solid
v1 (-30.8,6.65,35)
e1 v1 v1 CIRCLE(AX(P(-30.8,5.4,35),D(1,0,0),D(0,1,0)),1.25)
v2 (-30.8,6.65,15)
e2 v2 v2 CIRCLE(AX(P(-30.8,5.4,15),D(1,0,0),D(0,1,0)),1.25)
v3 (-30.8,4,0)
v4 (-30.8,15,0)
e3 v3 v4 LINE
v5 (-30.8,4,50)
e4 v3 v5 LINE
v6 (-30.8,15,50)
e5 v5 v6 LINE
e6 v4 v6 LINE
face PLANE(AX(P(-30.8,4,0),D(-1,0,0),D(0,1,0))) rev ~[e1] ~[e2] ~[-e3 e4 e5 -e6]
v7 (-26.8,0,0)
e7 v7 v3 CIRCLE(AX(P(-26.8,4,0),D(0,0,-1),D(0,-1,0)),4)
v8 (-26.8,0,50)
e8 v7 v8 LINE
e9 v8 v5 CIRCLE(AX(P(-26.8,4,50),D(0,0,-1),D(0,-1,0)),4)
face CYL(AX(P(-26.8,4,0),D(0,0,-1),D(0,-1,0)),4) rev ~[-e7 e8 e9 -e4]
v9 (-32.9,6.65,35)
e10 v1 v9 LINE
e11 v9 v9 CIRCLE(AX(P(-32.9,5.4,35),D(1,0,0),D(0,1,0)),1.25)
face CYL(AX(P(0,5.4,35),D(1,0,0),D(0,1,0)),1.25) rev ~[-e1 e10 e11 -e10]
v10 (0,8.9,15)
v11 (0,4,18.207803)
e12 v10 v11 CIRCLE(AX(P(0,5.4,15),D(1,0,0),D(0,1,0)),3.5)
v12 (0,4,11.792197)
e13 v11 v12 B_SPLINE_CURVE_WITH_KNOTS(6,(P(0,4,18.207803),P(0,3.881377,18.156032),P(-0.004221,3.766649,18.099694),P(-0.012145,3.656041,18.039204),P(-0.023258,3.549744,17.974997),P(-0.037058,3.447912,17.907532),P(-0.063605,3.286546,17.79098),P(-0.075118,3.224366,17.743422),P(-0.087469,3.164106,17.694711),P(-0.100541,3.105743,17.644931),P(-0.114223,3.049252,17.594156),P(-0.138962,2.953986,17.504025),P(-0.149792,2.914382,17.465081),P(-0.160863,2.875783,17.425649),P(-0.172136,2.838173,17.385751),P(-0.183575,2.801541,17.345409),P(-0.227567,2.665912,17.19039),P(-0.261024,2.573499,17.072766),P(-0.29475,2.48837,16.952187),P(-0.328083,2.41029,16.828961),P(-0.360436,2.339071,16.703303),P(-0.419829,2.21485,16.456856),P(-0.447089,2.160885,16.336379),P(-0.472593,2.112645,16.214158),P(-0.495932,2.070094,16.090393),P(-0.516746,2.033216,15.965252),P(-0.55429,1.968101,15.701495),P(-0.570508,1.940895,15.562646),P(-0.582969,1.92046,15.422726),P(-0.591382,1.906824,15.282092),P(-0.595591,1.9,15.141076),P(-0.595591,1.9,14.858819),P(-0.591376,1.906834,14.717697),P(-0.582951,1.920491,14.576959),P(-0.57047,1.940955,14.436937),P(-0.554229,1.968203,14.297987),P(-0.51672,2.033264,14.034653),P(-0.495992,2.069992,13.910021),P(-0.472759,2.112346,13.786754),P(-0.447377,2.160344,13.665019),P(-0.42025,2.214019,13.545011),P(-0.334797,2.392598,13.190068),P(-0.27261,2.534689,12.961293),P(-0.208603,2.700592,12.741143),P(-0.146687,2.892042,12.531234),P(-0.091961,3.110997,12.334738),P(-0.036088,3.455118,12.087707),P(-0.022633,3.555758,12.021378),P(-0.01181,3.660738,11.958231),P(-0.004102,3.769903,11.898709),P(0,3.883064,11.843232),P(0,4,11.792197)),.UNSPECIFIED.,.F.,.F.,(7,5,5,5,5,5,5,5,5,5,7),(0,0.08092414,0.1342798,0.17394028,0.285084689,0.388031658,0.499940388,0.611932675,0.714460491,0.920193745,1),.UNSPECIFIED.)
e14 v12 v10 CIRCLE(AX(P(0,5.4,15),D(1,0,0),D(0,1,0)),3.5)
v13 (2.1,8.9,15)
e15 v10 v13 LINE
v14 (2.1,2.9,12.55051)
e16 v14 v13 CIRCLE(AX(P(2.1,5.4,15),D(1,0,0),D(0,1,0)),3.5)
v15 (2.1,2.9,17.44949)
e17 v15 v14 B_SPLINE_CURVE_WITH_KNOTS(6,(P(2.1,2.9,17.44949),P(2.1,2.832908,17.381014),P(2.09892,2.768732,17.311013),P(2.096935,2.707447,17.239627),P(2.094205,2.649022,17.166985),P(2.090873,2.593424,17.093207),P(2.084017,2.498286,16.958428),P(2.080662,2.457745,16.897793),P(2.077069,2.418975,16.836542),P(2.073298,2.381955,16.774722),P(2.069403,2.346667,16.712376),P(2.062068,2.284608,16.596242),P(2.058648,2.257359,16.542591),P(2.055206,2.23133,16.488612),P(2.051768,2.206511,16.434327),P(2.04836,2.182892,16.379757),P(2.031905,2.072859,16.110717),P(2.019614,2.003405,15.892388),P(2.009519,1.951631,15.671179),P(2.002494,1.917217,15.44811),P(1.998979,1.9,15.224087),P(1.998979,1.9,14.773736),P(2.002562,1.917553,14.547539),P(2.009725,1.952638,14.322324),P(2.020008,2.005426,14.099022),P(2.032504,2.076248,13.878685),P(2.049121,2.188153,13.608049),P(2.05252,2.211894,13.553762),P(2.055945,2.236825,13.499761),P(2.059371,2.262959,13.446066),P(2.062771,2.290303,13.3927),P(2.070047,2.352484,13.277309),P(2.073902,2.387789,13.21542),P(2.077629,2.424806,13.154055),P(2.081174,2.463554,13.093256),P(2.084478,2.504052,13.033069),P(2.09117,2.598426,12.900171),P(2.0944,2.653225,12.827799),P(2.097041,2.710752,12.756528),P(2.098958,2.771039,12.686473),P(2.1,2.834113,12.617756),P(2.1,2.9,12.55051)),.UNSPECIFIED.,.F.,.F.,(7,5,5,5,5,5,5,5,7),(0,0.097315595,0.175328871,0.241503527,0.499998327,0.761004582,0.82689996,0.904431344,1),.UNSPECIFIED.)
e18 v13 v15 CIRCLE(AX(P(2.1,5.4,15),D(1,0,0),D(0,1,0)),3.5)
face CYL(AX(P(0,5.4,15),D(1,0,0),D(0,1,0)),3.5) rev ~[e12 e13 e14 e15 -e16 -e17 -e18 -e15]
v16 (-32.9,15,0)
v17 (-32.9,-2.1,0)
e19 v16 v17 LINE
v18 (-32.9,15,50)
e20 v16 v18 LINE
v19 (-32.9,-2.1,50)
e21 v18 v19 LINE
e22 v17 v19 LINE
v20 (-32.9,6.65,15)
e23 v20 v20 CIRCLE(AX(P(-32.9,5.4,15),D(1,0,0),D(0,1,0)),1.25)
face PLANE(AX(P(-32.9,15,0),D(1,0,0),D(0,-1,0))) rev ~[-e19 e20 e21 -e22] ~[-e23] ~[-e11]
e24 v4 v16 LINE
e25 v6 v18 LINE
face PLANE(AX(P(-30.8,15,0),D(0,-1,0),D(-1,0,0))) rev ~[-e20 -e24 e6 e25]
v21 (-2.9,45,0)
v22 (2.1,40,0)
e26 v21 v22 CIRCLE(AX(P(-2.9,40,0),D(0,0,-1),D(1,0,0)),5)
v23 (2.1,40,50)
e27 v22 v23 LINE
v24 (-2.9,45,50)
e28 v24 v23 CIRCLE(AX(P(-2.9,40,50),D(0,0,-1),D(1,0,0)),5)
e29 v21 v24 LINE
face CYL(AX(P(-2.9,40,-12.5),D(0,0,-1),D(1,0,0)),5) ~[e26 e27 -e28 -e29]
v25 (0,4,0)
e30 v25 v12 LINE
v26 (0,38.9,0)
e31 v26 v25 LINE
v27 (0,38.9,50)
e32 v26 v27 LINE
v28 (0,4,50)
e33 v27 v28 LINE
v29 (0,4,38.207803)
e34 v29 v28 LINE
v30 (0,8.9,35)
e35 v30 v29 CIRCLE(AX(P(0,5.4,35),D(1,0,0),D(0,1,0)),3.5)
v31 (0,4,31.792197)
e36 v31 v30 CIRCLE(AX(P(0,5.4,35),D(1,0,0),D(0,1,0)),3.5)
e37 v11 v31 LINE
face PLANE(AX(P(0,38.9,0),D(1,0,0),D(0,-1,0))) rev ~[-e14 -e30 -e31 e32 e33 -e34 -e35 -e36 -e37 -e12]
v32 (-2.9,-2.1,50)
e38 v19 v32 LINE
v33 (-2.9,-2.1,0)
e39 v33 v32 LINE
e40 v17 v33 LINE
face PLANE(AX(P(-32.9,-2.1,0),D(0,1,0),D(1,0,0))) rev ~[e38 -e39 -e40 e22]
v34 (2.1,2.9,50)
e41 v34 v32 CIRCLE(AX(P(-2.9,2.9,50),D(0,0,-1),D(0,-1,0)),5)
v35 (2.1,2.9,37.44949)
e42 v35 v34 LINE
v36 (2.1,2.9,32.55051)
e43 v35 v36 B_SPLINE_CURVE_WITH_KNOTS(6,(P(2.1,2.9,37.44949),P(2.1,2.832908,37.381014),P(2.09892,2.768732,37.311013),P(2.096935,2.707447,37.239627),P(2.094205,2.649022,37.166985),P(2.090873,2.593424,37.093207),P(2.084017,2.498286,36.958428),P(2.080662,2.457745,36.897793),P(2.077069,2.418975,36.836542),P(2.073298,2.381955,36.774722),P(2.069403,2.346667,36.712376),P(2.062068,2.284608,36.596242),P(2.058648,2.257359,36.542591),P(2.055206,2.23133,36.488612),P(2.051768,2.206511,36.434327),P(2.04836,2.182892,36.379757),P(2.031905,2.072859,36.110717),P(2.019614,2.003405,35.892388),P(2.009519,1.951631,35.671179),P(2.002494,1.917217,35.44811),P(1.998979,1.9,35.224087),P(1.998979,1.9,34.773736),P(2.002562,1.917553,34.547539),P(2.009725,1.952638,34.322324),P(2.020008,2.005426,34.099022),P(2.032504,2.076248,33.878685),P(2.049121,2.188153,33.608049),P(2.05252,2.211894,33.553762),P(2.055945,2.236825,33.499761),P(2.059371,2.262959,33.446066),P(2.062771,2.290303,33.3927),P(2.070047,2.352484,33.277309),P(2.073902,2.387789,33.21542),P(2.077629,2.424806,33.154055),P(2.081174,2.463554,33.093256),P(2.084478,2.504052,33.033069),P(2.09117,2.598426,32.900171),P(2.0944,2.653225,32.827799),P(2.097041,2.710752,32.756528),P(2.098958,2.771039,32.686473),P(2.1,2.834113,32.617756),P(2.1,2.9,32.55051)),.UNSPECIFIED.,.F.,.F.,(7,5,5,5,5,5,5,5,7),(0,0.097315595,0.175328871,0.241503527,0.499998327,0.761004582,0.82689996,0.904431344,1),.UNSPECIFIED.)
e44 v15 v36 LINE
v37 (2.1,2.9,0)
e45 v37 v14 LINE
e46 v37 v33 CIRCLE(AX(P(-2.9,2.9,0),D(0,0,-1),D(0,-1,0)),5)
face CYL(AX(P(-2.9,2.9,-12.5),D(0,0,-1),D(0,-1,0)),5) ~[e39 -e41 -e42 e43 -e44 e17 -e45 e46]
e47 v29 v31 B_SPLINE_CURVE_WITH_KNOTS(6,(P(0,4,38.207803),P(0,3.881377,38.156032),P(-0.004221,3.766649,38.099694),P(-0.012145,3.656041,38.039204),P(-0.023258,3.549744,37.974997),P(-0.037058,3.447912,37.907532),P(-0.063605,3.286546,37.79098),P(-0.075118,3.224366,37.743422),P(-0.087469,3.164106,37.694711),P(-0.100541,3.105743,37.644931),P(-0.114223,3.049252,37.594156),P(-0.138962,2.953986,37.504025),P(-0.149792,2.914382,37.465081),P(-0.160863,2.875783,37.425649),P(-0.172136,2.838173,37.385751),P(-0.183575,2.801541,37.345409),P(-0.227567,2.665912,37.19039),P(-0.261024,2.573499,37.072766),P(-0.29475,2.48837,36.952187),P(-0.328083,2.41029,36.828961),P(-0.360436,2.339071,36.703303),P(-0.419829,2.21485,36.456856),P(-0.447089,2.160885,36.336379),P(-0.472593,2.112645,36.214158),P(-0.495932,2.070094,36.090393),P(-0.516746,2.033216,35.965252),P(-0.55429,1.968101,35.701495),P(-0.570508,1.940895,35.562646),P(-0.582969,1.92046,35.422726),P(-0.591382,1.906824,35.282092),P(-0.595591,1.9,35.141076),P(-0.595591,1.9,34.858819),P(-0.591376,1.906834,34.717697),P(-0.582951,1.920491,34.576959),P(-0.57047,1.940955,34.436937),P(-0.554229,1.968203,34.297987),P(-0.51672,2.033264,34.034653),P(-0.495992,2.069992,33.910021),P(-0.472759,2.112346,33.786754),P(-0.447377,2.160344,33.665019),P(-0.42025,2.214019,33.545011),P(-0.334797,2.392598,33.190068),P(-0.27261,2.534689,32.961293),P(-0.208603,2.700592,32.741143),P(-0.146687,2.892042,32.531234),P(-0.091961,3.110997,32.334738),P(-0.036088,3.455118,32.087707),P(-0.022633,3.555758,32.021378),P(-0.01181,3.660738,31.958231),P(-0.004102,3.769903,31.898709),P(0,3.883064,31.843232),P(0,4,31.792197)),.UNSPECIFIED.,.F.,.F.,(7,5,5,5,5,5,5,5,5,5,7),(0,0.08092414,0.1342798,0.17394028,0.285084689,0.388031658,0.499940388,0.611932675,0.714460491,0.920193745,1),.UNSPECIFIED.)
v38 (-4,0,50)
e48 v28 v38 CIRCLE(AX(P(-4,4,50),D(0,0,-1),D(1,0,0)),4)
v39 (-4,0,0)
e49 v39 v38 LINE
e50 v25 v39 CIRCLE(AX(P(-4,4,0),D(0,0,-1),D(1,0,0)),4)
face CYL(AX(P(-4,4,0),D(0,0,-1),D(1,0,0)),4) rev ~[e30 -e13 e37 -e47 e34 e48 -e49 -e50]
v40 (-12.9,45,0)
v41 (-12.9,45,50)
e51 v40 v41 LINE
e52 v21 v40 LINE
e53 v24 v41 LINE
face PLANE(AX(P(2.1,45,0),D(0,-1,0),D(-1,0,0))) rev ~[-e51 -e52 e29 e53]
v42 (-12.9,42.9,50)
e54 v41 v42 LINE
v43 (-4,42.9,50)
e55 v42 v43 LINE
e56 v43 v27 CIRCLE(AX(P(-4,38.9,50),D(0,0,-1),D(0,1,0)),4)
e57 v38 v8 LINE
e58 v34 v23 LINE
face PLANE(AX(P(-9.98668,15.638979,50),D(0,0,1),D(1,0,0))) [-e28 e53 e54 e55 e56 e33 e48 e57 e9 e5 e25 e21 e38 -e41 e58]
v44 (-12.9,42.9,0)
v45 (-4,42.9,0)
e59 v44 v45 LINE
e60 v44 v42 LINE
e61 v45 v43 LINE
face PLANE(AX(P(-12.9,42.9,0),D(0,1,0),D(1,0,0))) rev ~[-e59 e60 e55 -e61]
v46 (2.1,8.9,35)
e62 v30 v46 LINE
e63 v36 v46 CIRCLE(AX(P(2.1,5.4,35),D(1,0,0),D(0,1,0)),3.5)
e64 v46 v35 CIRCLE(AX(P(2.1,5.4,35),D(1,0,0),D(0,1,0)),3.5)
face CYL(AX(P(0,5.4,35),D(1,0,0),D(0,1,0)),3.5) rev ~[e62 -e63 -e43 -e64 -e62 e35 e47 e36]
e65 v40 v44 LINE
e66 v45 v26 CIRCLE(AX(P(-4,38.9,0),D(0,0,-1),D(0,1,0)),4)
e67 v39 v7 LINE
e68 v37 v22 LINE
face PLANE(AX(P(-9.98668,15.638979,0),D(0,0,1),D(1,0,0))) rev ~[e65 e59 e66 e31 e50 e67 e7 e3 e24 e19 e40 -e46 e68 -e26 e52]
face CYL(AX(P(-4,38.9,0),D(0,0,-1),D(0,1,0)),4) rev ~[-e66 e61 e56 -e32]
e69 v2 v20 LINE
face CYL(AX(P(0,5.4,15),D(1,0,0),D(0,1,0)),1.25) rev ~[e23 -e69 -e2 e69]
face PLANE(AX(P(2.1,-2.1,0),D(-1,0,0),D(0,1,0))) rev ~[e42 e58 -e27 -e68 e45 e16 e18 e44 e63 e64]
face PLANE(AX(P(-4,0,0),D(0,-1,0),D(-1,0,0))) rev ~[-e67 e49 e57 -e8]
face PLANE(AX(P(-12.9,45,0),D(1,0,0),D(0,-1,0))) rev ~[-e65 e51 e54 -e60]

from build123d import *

# Parameters (mm, degrees)
F1_DEPTH      = 50
F2_R          = 1.25
F3_DEPTH      = 32.901
F2_R_2        = 3.5
F4_DEPTH      = 2.1
F4_DEPTH_BACK = 10
F5_T1_DEPTH   = 75


# Not quite as in the source:
# - a fillet or chamfer that OpenCascade refuses, or shapes differently, is made with other operations: its cross-section is extruded or revolved along the edge and cut away or added


with BuildPart() as f1:
    # F0 (on Top) → F1 (new body)
    with BuildSketch(Plane.XY):
        with BuildLine():
            ThreePointArc((0, 4), (-1.1715728753, 1.1715728753), (-4, 0))
            Line((-4, 0), (-26.8, 0))
            ThreePointArc((-26.8, 0), (-29.6284271247, 1.1715728753), (-30.8, 4))
            Line((-30.8, 4), (-30.8, 15))
            Line((-30.8, 15), (-32.9, 15))
            Line((-32.9, 15), (-32.9, -2.1))
            Line((-32.9, -2.1), (2.1, -2.1))
            Line((2.1, -2.1), (2.1, 45))
            Line((2.1, 45), (-12.9, 45))
            Line((-12.9, 45), (-12.9, 42.9))
            Line((-12.9, 42.9), (-4, 42.9))
            ThreePointArc((-4, 42.9), (-1.1715728753, 41.7284271247), (0, 38.9))
            Line((0, 38.9), (0, 4))
        make_face()
    extrude(amount=F1_DEPTH)

    # F2 (on Right) → F3 (cut, through all)
    with BuildSketch(Plane.YZ):
        with Locations((5.4, 35)):
            Circle(F2_R)
        with Locations((5.4, 15)):
            Circle(F2_R)
    extrude(amount=-F3_DEPTH, mode=Mode.SUBTRACT)

    # F2 (on Right) → F4 (cut, two sides)
    with BuildSketch(Plane.YZ) as f4_sk:
        with Locations((5.4, 35)):
            Circle(F2_R_2)
        with Locations((5.4, 35)):
            Circle(F2_R, mode=Mode.SUBTRACT)
        with Locations((5.4, 15)):
            Circle(F2_R_2)
        with Locations((5.4, 15)):
            Circle(F2_R, mode=Mode.SUBTRACT)
        with Locations((5.4, 15)):
            Circle(F2_R)
        with Locations((5.4, 35)):
            Circle(F2_R)
    extrude(amount=F4_DEPTH, mode=Mode.SUBTRACT)
    extrude(f4_sk.sketch, amount=-F4_DEPTH_BACK, mode=Mode.SUBTRACT)

    # F5: fillet of radius 5 on 2 edges, made by hand

    # F5_s2 → F5_t1 (cut)
    with BuildSketch(Plane.XY.offset(-12.5)):
        with BuildLine():
            ThreePointArc((2.1, 40), (0.6355339059, 43.5355339059), (-2.9, 45))
            Line((-2.9, 45), (2.1, 45))
            Line((2.1, 45), (2.1, 40))
        make_face()
        with BuildLine():
            ThreePointArc((-2.9, -2.1), (0.6355339059, -0.6355339059), (2.1, 2.9))
            Line((2.1, 2.9), (2.1, -2.1))
            Line((2.1, -2.1), (-2.9, -2.1))
        make_face()
    extrude(amount=F5_T1_DEPTH, mode=Mode.SUBTRACT)


solid = f1.part
